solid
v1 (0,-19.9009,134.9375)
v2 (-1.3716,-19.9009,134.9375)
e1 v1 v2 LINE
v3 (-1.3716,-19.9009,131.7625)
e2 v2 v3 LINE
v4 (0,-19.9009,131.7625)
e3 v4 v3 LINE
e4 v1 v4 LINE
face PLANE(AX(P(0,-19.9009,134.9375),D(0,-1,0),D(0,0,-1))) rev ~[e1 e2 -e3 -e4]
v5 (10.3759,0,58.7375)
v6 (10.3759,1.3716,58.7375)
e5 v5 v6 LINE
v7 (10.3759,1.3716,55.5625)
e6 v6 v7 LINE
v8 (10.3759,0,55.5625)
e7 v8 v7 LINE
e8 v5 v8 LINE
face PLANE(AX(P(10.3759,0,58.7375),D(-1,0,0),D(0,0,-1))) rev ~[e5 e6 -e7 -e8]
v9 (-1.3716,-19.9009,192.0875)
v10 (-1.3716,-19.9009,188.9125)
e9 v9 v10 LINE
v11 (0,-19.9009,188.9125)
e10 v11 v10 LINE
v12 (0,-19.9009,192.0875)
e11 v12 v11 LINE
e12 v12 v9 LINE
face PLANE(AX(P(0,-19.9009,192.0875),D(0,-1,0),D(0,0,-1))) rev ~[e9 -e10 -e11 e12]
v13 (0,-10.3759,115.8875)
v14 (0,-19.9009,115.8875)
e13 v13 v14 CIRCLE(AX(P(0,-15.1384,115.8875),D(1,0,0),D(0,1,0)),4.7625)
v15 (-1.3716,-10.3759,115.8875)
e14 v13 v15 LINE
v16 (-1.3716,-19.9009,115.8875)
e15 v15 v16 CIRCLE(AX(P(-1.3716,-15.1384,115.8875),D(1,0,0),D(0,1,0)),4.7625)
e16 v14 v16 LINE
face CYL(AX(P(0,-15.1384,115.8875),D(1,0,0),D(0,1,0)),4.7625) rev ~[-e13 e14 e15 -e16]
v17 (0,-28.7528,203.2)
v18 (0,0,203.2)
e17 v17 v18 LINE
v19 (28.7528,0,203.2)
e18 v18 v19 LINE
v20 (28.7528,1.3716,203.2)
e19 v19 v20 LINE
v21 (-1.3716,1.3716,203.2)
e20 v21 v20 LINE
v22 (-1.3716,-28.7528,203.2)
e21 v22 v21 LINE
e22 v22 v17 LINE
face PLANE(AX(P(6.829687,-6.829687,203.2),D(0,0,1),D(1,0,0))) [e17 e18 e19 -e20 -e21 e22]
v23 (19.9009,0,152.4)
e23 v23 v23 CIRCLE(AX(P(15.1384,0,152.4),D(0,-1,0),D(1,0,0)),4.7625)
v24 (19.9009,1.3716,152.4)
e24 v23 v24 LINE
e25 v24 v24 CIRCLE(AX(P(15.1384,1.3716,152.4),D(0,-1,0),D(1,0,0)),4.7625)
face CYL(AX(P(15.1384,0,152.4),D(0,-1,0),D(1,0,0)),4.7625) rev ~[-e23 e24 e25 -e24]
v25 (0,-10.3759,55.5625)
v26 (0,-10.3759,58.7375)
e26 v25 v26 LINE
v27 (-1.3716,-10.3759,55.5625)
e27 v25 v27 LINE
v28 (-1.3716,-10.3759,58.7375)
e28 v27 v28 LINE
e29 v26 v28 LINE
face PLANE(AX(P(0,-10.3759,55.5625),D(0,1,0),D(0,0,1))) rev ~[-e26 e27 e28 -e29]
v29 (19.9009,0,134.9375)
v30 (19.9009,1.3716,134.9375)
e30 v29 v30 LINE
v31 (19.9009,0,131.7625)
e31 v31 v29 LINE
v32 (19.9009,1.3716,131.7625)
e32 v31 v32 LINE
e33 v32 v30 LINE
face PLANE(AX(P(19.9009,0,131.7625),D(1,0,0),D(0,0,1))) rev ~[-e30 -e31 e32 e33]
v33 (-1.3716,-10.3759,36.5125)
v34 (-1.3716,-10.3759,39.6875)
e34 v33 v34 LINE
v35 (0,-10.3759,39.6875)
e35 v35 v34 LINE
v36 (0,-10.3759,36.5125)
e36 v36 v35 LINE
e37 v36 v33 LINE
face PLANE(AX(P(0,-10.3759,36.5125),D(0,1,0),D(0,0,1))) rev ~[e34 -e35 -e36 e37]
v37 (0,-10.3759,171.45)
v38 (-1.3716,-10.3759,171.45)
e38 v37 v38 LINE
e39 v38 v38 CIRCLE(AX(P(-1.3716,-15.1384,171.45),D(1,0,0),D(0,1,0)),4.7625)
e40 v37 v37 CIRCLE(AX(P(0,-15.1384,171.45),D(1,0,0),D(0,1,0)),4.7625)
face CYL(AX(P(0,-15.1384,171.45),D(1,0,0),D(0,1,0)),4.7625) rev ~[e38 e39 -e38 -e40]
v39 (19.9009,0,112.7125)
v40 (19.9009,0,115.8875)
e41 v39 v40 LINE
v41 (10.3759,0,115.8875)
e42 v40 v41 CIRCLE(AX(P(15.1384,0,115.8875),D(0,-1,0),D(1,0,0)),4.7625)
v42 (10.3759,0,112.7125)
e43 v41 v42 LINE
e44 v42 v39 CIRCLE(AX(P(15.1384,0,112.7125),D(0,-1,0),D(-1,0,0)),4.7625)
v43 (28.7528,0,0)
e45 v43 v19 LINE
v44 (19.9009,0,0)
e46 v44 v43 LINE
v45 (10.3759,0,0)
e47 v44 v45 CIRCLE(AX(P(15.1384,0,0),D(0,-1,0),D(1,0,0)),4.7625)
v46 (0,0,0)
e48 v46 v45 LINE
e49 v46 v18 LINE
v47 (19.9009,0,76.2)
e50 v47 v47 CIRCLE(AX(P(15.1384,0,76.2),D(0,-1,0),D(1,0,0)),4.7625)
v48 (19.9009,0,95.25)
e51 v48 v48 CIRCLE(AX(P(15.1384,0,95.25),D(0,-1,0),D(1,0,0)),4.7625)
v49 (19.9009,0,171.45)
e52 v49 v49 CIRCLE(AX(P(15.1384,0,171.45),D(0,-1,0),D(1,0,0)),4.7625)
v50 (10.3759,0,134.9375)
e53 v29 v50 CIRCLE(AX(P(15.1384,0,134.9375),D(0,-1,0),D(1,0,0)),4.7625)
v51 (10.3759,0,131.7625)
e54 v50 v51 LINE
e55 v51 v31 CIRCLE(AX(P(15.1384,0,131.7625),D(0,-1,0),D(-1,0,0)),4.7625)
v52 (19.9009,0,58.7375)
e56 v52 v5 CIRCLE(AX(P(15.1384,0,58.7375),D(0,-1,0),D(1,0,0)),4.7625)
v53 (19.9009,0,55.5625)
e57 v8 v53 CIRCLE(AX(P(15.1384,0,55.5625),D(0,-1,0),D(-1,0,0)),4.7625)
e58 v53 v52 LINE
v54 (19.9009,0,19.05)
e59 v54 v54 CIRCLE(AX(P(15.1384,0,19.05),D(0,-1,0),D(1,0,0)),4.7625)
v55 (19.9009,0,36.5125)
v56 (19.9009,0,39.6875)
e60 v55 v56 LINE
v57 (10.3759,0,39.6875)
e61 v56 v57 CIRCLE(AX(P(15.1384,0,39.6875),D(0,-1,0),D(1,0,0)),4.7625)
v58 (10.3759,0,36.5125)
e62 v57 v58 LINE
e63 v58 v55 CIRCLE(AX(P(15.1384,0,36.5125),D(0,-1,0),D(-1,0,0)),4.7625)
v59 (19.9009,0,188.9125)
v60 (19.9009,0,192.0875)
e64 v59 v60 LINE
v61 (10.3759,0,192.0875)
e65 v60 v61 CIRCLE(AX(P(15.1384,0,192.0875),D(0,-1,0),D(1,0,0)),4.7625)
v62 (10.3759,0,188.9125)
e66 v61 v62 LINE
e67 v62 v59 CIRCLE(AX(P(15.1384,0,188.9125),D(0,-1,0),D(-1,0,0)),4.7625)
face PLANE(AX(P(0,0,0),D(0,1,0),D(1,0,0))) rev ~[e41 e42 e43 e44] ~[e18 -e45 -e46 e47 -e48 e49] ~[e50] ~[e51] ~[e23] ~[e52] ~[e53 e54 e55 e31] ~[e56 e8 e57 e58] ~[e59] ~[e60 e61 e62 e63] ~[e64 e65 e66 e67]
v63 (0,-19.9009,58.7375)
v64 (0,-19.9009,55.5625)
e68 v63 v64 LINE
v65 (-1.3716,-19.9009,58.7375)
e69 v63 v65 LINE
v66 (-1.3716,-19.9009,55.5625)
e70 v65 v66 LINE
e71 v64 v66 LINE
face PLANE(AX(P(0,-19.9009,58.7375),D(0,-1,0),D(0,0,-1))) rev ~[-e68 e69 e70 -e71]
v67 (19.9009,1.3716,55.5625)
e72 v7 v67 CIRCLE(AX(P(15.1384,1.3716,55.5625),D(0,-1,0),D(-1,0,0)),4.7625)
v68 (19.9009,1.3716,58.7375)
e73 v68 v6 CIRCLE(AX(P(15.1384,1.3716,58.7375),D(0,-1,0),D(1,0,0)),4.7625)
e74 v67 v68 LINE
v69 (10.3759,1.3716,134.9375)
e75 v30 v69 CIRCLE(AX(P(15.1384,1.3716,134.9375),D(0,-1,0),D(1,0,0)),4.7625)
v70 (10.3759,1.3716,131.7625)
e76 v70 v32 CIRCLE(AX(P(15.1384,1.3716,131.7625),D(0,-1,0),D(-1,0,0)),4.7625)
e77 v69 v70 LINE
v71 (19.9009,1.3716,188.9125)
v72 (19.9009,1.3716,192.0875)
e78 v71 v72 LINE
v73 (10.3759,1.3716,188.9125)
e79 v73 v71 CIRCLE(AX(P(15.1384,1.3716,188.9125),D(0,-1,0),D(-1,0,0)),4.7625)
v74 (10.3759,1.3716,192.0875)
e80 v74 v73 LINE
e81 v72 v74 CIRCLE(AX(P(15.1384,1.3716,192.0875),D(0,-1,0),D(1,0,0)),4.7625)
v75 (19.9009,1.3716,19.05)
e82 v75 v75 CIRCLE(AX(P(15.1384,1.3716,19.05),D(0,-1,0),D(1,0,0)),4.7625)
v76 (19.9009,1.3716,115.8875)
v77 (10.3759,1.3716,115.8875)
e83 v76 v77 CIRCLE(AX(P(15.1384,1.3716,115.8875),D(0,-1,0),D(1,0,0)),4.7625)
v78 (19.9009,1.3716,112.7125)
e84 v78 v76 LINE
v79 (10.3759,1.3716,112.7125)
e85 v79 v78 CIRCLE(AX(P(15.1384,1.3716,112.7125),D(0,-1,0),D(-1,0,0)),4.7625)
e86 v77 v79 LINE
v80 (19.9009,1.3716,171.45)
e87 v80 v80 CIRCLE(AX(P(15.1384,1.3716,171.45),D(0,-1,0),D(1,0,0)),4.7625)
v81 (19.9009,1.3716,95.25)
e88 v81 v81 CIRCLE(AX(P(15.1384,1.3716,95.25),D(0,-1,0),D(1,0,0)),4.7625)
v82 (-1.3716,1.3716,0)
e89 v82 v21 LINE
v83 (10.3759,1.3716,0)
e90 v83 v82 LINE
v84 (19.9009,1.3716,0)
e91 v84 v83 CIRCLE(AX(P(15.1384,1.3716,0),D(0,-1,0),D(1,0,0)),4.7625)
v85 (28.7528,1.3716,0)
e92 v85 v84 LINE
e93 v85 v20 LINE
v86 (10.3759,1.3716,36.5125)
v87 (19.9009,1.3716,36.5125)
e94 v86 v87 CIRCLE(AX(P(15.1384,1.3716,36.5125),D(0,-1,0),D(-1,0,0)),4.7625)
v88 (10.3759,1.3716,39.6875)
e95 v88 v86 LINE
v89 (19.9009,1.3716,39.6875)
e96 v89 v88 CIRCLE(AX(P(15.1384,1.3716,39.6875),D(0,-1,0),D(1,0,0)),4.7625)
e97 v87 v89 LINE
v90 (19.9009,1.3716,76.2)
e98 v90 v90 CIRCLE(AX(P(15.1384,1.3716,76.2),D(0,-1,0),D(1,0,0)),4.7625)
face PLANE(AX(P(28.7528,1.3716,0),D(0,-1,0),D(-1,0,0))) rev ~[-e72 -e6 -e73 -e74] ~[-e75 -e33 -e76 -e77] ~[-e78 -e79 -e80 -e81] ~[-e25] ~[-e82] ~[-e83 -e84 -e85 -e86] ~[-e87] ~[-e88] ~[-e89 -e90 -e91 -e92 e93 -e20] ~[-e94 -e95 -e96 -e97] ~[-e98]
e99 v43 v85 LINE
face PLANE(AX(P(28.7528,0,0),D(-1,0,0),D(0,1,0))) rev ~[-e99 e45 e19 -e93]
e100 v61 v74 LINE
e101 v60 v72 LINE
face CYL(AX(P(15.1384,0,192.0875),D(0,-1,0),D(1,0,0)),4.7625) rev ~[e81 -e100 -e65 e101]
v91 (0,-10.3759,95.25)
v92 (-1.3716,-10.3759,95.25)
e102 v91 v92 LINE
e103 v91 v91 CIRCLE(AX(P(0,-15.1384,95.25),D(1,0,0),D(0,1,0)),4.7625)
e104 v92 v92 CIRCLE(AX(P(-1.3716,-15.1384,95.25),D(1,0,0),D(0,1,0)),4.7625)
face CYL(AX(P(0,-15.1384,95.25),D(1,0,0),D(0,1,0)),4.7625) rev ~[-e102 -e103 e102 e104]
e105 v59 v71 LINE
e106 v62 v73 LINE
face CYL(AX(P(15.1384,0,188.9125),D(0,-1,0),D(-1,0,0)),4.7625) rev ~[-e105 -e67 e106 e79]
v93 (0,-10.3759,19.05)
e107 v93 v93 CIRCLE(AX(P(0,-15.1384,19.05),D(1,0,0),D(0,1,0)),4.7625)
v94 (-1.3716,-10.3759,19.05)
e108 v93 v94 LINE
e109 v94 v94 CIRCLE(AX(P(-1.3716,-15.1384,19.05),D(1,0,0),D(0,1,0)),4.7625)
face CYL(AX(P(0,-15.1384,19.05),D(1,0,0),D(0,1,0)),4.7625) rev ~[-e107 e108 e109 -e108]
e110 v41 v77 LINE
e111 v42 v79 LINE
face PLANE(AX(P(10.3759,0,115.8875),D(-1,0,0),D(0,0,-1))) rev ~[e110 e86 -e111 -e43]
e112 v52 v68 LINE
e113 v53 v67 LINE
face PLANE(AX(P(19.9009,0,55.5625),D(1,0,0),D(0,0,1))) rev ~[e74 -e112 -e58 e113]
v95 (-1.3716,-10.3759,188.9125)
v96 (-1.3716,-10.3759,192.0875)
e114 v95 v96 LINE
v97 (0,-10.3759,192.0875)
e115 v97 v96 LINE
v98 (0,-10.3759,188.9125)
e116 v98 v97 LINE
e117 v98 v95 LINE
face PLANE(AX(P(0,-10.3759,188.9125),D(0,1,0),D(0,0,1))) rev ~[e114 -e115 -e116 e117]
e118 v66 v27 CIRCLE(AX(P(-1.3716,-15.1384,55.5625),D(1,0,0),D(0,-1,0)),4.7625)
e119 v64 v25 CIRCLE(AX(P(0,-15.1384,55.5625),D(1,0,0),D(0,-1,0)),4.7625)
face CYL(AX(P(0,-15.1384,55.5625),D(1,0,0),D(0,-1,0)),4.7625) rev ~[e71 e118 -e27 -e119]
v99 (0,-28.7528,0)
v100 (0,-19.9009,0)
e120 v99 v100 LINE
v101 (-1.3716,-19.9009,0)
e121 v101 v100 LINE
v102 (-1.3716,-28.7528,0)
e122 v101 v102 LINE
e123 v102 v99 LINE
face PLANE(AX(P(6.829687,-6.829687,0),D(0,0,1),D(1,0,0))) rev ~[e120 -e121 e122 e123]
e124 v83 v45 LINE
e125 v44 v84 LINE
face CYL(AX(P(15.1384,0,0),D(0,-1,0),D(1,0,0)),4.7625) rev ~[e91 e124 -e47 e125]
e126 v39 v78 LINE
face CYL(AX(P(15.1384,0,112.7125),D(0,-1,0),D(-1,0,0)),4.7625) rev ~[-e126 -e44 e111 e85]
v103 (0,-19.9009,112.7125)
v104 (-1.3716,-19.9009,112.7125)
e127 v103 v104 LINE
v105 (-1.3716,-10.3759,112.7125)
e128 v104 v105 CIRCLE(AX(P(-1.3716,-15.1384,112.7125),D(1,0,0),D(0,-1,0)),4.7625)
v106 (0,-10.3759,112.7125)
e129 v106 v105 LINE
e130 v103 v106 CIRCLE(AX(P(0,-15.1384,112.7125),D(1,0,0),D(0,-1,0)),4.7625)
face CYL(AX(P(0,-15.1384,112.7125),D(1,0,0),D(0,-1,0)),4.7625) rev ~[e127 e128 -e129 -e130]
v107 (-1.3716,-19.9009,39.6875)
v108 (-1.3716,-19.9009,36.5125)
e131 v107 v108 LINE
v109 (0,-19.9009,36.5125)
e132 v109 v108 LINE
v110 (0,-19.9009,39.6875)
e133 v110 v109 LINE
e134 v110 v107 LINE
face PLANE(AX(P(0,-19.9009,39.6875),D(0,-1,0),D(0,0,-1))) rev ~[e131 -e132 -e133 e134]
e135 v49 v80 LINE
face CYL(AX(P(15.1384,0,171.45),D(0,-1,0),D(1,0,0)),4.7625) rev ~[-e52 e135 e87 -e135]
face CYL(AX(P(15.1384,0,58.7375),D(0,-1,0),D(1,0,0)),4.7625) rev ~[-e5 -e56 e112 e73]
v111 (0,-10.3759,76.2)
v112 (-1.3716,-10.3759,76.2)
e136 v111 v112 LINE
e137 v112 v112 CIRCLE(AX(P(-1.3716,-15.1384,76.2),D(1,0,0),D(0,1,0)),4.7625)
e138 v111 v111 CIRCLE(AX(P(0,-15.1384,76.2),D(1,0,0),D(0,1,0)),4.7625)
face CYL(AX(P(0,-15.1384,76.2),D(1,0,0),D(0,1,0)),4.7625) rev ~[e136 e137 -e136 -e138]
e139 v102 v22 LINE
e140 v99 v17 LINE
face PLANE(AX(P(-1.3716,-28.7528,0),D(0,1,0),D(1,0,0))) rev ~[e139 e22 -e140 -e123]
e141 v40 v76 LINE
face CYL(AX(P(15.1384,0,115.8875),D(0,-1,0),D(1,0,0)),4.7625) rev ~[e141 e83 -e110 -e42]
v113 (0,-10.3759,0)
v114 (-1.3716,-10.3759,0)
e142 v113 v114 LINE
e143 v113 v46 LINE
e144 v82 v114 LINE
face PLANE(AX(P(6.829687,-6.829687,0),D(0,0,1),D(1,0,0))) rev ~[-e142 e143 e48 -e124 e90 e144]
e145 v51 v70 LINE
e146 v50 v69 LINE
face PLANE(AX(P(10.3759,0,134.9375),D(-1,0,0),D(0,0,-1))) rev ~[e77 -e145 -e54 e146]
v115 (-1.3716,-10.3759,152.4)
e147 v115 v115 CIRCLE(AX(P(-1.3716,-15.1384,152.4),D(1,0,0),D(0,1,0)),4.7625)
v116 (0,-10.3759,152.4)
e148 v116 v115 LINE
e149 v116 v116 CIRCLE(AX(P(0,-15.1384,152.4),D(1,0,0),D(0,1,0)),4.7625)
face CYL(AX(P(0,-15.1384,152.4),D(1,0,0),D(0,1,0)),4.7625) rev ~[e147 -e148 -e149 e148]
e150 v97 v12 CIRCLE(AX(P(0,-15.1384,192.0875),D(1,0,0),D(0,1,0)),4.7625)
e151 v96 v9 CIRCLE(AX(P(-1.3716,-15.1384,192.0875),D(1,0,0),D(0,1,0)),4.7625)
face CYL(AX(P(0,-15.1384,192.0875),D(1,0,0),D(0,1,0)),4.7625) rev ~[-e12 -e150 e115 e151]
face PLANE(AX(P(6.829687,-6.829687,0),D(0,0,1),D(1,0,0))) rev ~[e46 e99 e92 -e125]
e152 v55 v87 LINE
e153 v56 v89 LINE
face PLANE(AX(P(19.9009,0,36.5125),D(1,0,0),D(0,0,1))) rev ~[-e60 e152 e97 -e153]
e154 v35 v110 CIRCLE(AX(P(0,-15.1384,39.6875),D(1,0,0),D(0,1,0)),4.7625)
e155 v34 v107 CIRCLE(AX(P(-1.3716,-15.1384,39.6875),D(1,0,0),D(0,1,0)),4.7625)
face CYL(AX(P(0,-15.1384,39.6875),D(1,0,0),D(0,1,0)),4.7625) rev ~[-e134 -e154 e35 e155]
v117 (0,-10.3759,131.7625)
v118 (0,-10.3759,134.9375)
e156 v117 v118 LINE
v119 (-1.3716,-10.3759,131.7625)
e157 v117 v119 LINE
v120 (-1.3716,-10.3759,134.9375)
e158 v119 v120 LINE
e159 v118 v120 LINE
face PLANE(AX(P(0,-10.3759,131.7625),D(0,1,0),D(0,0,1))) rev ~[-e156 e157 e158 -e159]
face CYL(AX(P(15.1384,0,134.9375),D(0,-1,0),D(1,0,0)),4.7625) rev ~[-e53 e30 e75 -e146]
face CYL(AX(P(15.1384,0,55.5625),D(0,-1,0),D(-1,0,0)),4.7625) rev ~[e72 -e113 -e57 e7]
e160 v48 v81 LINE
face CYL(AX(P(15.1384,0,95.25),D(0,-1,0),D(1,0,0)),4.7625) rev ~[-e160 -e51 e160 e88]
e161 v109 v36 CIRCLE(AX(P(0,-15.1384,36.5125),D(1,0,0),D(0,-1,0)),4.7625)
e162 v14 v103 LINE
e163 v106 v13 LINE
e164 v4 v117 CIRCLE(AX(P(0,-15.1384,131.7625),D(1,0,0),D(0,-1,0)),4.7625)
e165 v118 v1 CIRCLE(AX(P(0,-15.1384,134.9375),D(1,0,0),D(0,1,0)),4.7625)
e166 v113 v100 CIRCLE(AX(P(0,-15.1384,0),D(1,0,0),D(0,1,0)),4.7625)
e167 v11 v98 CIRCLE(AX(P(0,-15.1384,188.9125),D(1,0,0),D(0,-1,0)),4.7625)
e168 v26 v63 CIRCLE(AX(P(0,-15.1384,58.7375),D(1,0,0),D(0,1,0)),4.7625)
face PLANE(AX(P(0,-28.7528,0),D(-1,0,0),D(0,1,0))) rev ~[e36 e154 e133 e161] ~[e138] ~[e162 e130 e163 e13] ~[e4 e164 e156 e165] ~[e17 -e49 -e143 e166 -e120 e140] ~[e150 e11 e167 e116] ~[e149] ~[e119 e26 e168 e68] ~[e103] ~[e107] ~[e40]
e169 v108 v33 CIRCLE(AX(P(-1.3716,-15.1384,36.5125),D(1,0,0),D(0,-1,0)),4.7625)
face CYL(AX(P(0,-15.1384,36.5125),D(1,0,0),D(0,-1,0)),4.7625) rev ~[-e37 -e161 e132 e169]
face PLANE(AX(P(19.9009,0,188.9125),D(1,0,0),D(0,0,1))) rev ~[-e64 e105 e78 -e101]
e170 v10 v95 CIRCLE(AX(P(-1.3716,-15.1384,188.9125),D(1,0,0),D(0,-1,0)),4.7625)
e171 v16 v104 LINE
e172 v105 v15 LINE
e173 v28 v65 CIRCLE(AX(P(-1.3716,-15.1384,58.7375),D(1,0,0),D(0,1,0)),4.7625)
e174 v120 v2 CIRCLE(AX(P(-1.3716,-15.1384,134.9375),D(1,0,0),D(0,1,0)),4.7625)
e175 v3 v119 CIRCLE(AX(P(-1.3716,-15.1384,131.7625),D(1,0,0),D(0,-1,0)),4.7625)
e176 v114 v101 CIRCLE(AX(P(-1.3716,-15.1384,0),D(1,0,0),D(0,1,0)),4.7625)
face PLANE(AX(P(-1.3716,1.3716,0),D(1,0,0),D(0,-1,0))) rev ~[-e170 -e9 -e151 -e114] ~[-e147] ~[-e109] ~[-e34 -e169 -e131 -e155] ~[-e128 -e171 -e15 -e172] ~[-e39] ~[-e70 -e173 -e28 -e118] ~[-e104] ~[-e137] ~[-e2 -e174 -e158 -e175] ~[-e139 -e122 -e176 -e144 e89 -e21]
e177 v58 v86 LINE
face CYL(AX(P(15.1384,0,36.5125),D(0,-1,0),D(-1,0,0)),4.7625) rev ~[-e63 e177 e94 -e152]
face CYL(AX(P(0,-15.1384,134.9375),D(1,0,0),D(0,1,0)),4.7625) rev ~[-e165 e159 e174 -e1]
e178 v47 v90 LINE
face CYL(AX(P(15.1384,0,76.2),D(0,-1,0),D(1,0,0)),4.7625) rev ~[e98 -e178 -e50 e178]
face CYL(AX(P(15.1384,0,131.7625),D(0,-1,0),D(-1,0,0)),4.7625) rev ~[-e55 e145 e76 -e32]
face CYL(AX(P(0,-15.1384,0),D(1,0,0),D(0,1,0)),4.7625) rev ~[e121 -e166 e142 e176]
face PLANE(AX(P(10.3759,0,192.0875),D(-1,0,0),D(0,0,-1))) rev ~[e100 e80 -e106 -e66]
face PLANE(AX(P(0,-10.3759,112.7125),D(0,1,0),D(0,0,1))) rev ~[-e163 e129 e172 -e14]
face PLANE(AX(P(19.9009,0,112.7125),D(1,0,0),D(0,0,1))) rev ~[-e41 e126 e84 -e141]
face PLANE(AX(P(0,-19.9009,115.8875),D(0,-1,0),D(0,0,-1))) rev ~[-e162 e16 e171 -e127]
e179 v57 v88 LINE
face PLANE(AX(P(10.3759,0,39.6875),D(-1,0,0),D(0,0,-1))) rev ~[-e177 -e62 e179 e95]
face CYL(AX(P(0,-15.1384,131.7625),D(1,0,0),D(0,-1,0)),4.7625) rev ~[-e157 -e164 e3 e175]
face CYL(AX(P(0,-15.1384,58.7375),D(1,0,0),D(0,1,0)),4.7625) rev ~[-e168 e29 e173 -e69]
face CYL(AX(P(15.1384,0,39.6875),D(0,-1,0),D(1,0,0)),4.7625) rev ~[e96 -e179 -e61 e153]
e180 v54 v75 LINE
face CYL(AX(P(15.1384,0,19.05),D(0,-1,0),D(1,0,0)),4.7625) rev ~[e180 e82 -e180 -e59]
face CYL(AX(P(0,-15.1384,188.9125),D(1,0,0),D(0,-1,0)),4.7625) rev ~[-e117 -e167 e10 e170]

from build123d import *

# Parameters (mm, degrees)
F2_DEPTH = 203.2
F3_R     = 4.7625
F5_DEPTH = 1.3726
F4_R     = 4.7625
F6_DEPTH = 1.3726


# Not quite as in the source:
# - a variable given as a bare number and used for a length is read in inches; the dataset says mm whatever the document's units were


with BuildPart() as f2:
    # F1 (on Top) → F2 (new body)
    with BuildSketch(Plane.XY):
        Polygon((-1.3716, 1.3716), (-1.3716, -28.7528), (0, -28.7528), (0, 0), (28.7528, 0), (28.7528, 1.3716), align=None)
    extrude(amount=F2_DEPTH)

    # F3 (on face) → F5 (cut, through all)
    with BuildSketch(Plane.XZ):
        with Locations((15.1384, 19.05)):
            Circle(F3_R)
        with Locations((15.1384, 0)):
            Circle(F3_R)
        with BuildLine():
            Line((19.9009, 36.5125), (19.9009, 39.6875))
            ThreePointArc((19.9009, 39.6875), (15.1384, 44.45), (10.3759, 39.6875))
            Line((10.3759, 39.6875), (10.3759, 36.5125))
            ThreePointArc((10.3759, 36.5125), (15.1384, 31.75), (19.9009, 36.5125))
        make_face()
        with BuildLine():
            Line((19.9009, 55.5625), (19.9009, 58.7375))
            ThreePointArc((19.9009, 58.7375), (15.1384, 63.5), (10.3759, 58.7375))
            Line((10.3759, 58.7375), (10.3759, 55.5625))
            ThreePointArc((10.3759, 55.5625), (15.1384, 50.8), (19.9009, 55.5625))
        make_face()
        with BuildLine():
            Line((19.9009, 131.7625), (19.9009, 134.9375))
            ThreePointArc((19.9009, 134.9375), (15.1384, 139.7), (10.3759, 134.9375))
            Line((10.3759, 134.9375), (10.3759, 131.7625))
            ThreePointArc((10.3759, 131.7625), (15.1384, 127), (19.9009, 131.7625))
        make_face()
        with Locations((15.1384, 95.25)):
            Circle(F3_R)
        with Locations((15.1384, 76.2)):
            Circle(F3_R)
        with BuildLine():
            Line((19.9009, 112.7125), (19.9009, 115.8875))
            ThreePointArc((19.9009, 115.8875), (15.1384, 120.65), (10.3759, 115.8875))
            Line((10.3759, 115.8875), (10.3759, 112.7125))
            ThreePointArc((10.3759, 112.7125), (15.1384, 107.95), (19.9009, 112.7125))
        make_face()
        with BuildLine():
            Line((19.9009, 207.9625), (19.9009, 211.1375))
            ThreePointArc((19.9009, 211.1375), (15.1384, 215.9), (10.3759, 211.1375))
            Line((10.3759, 211.1375), (10.3759, 207.9625))
            ThreePointArc((10.3759, 207.9625), (15.1384, 203.2), (19.9009, 207.9625))
        make_face()
        with Locations((15.1384, 171.45)):
            Circle(F3_R)
        with Locations((15.1384, 152.4)):
            Circle(F3_R)
        with BuildLine():
            Line((19.9009, 188.9125), (19.9009, 192.0875))
            ThreePointArc((19.9009, 192.0875), (15.1384, 196.85), (10.3759, 192.0875))
            Line((10.3759, 192.0875), (10.3759, 188.9125))
            ThreePointArc((10.3759, 188.9125), (15.1384, 184.15), (19.9009, 188.9125))
        make_face()
        with BuildLine():
            Line((19.9009, 284.1625), (19.9009, 287.3375))
            ThreePointArc((19.9009, 287.3375), (15.1384, 292.1), (10.3759, 287.3375))
            Line((10.3759, 287.3375), (10.3759, 284.1625))
            ThreePointArc((10.3759, 284.1625), (15.1384, 279.4), (19.9009, 284.1625))
        make_face()
        with Locations((15.1384, 247.65)):
            Circle(F3_R)
        with Locations((15.1384, 228.6)):
            Circle(F3_R)
        with BuildLine():
            Line((19.9009, 265.1125), (19.9009, 268.2875))
            ThreePointArc((19.9009, 268.2875), (15.1384, 273.05), (10.3759, 268.2875))
            Line((10.3759, 268.2875), (10.3759, 265.1125))
            ThreePointArc((10.3759, 265.1125), (15.1384, 260.35), (19.9009, 265.1125))
        make_face()
        with BuildLine():
            Line((19.9009, 360.3625), (19.9009, 363.5375))
            ThreePointArc((19.9009, 363.5375), (15.1384, 368.3), (10.3759, 363.5375))
            Line((10.3759, 363.5375), (10.3759, 360.3625))
            ThreePointArc((10.3759, 360.3625), (15.1384, 355.6), (19.9009, 360.3625))
        make_face()
        with Locations((15.1384, 323.85)):
            Circle(F3_R)
        with Locations((15.1384, 304.8)):
            Circle(F3_R)
        with BuildLine():
            Line((19.9009, 341.3125), (19.9009, 344.4875))
            ThreePointArc((19.9009, 344.4875), (15.1384, 349.25), (10.3759, 344.4875))
            Line((10.3759, 344.4875), (10.3759, 341.3125))
            ThreePointArc((10.3759, 341.3125), (15.1384, 336.55), (19.9009, 341.3125))
        make_face()
        with BuildLine():
            Line((19.9009, 436.5625), (19.9009, 439.7375))
            ThreePointArc((19.9009, 439.7375), (15.1384, 444.5), (10.3759, 439.7375))
            Line((10.3759, 439.7375), (10.3759, 436.5625))
            ThreePointArc((10.3759, 436.5625), (15.1384, 431.8), (19.9009, 436.5625))
        make_face()
        with Locations((15.1384, 400.05)):
            Circle(F3_R)
        with Locations((15.1384, 381)):
            Circle(F3_R)
        with BuildLine():
            Line((19.9009, 417.5125), (19.9009, 420.6875))
            ThreePointArc((19.9009, 420.6875), (15.1384, 425.45), (10.3759, 420.6875))
            Line((10.3759, 420.6875), (10.3759, 417.5125))
            ThreePointArc((10.3759, 417.5125), (15.1384, 412.75), (19.9009, 417.5125))
        make_face()
        with BuildLine():
            Line((19.9009, 512.7625), (19.9009, 515.9375))
            ThreePointArc((19.9009, 515.9375), (15.1384, 520.7), (10.3759, 515.9375))
            Line((10.3759, 515.9375), (10.3759, 512.7625))
            ThreePointArc((10.3759, 512.7625), (15.1384, 508), (19.9009, 512.7625))
        make_face()
        with Locations((15.1384, 476.25)):
            Circle(F3_R)
        with Locations((15.1384, 457.2)):
            Circle(F3_R)
        with BuildLine():
            Line((19.9009, 493.7125), (19.9009, 496.8875))
            ThreePointArc((19.9009, 496.8875), (15.1384, 501.65), (10.3759, 496.8875))
            Line((10.3759, 496.8875), (10.3759, 493.7125))
            ThreePointArc((10.3759, 493.7125), (15.1384, 488.95), (19.9009, 493.7125))
        make_face()
        with BuildLine():
            Line((19.9009, 588.9625), (19.9009, 592.1375))
            ThreePointArc((19.9009, 592.1375), (15.1384, 596.9), (10.3759, 592.1375))
            Line((10.3759, 592.1375), (10.3759, 588.9625))
            ThreePointArc((10.3759, 588.9625), (15.1384, 584.2), (19.9009, 588.9625))
        make_face()
        with Locations((15.1384, 552.45)):
            Circle(F3_R)
        with Locations((15.1384, 533.4)):
            Circle(F3_R)
        with BuildLine():
            Line((19.9009, 569.9125), (19.9009, 573.0875))
            ThreePointArc((19.9009, 573.0875), (15.1384, 577.85), (10.3759, 573.0875))
            Line((10.3759, 573.0875), (10.3759, 569.9125))
            ThreePointArc((10.3759, 569.9125), (15.1384, 565.15), (19.9009, 569.9125))
        make_face()
        with BuildLine():
            Line((19.9009, 665.1625), (19.9009, 668.3375))
            ThreePointArc((19.9009, 668.3375), (15.1384, 673.1), (10.3759, 668.3375))
            Line((10.3759, 668.3375), (10.3759, 665.1625))
            ThreePointArc((10.3759, 665.1625), (15.1384, 660.4), (19.9009, 665.1625))
        make_face()
        with Locations((15.1384, 628.65)):
            Circle(F3_R)
        with Locations((15.1384, 609.6)):
            Circle(F3_R)
        with BuildLine():
            Line((19.9009, 646.1125), (19.9009, 649.2875))
            ThreePointArc((19.9009, 649.2875), (15.1384, 654.05), (10.3759, 649.2875))
            Line((10.3759, 649.2875), (10.3759, 646.1125))
            ThreePointArc((10.3759, 646.1125), (15.1384, 641.35), (19.9009, 646.1125))
        make_face()
        with BuildLine():
            Line((19.9009, 741.3625), (19.9009, 744.5375))
            ThreePointArc((19.9009, 744.5375), (15.1384, 749.3), (10.3759, 744.5375))
            Line((10.3759, 744.5375), (10.3759, 741.3625))
            ThreePointArc((10.3759, 741.3625), (15.1384, 736.6), (19.9009, 741.3625))
        make_face()
        with Locations((15.1384, 704.85)):
            Circle(F3_R)
        with Locations((15.1384, 685.8)):
            Circle(F3_R)
        with BuildLine():
            Line((19.9009, 722.3125), (19.9009, 725.4875))
            ThreePointArc((19.9009, 725.4875), (15.1384, 730.25), (10.3759, 725.4875))
            Line((10.3759, 725.4875), (10.3759, 722.3125))
            ThreePointArc((10.3759, 722.3125), (15.1384, 717.55), (19.9009, 722.3125))
        make_face()
        with BuildLine():
            Line((19.9009, 817.5625), (19.9009, 820.7375))
            ThreePointArc((19.9009, 820.7375), (15.1384, 825.5), (10.3759, 820.7375))
            Line((10.3759, 820.7375), (10.3759, 817.5625))
            ThreePointArc((10.3759, 817.5625), (15.1384, 812.8), (19.9009, 817.5625))
        make_face()
        with Locations((15.1384, 781.05)):
            Circle(F3_R)
        with Locations((15.1384, 762)):
            Circle(F3_R)
        with BuildLine():
            Line((19.9009, 798.5125), (19.9009, 801.6875))
            ThreePointArc((19.9009, 801.6875), (15.1384, 806.45), (10.3759, 801.6875))
            Line((10.3759, 801.6875), (10.3759, 798.5125))
            ThreePointArc((10.3759, 798.5125), (15.1384, 793.75), (19.9009, 798.5125))
        make_face()
        with BuildLine():
            Line((19.9009, 893.7625), (19.9009, 896.9375))
            ThreePointArc((19.9009, 896.9375), (15.1384, 901.7), (10.3759, 896.9375))
            Line((10.3759, 896.9375), (10.3759, 893.7625))
            ThreePointArc((10.3759, 893.7625), (15.1384, 889), (19.9009, 893.7625))
        make_face()
        with Locations((15.1384, 857.25)):
            Circle(F3_R)
        with Locations((15.1384, 838.2)):
            Circle(F3_R)
        with BuildLine():
            Line((19.9009, 874.7125), (19.9009, 877.8875))
            ThreePointArc((19.9009, 877.8875), (15.1384, 882.65), (10.3759, 877.8875))
            Line((10.3759, 877.8875), (10.3759, 874.7125))
            ThreePointArc((10.3759, 874.7125), (15.1384, 869.95), (19.9009, 874.7125))
        make_face()
        with BuildLine():
            Line((19.9009, 969.9625), (19.9009, 973.1375))
            ThreePointArc((19.9009, 973.1375), (15.1384, 977.9), (10.3759, 973.1375))
            Line((10.3759, 973.1375), (10.3759, 969.9625))
            ThreePointArc((10.3759, 969.9625), (15.1384, 965.2), (19.9009, 969.9625))
        make_face()
        with Locations((15.1384, 933.45)):
            Circle(F3_R)
        with Locations((15.1384, 914.4)):
            Circle(F3_R)
        with BuildLine():
            Line((19.9009, 950.9125), (19.9009, 954.0875))
            ThreePointArc((19.9009, 954.0875), (15.1384, 958.85), (10.3759, 954.0875))
            Line((10.3759, 954.0875), (10.3759, 950.9125))
            ThreePointArc((10.3759, 950.9125), (15.1384, 946.15), (19.9009, 950.9125))
        make_face()
        with BuildLine():
            Line((19.9009, 1046.1625), (19.9009, 1049.3375))
            ThreePointArc((19.9009, 1049.3375), (15.1384, 1054.1), (10.3759, 1049.3375))
            Line((10.3759, 1049.3375), (10.3759, 1046.1625))
            ThreePointArc((10.3759, 1046.1625), (15.1384, 1041.4), (19.9009, 1046.1625))
        make_face()
        with Locations((15.1384, 1009.65)):
            Circle(F3_R)
        with Locations((15.1384, 990.6)):
            Circle(F3_R)
        with BuildLine():
            Line((19.9009, 1027.1125), (19.9009, 1030.2875))
            ThreePointArc((19.9009, 1030.2875), (15.1384, 1035.05), (10.3759, 1030.2875))
            Line((10.3759, 1030.2875), (10.3759, 1027.1125))
            ThreePointArc((10.3759, 1027.1125), (15.1384, 1022.35), (19.9009, 1027.1125))
        make_face()
        with BuildLine():
            Line((19.9009, 1122.3625), (19.9009, 1125.5375))
            ThreePointArc((19.9009, 1125.5375), (15.1384, 1130.3), (10.3759, 1125.5375))
            Line((10.3759, 1125.5375), (10.3759, 1122.3625))
            ThreePointArc((10.3759, 1122.3625), (15.1384, 1117.6), (19.9009, 1122.3625))
        make_face()
        with Locations((15.1384, 1085.85)):
            Circle(F3_R)
        with Locations((15.1384, 1066.8)):
            Circle(F3_R)
        with BuildLine():
            Line((19.9009, 1103.3125), (19.9009, 1106.4875))
            ThreePointArc((19.9009, 1106.4875), (15.1384, 1111.25), (10.3759, 1106.4875))
            Line((10.3759, 1106.4875), (10.3759, 1103.3125))
            ThreePointArc((10.3759, 1103.3125), (15.1384, 1098.55), (19.9009, 1103.3125))
        make_face()
        with BuildLine():
            Line((19.9009, 1198.5625), (19.9009, 1201.7375))
            ThreePointArc((19.9009, 1201.7375), (15.1384, 1206.5), (10.3759, 1201.7375))
            Line((10.3759, 1201.7375), (10.3759, 1198.5625))
            ThreePointArc((10.3759, 1198.5625), (15.1384, 1193.8), (19.9009, 1198.5625))
        make_face()
        with Locations((15.1384, 1162.05)):
            Circle(F3_R)
        with Locations((15.1384, 1143)):
            Circle(F3_R)
        with BuildLine():
            Line((19.9009, 1179.5125), (19.9009, 1182.6875))
            ThreePointArc((19.9009, 1182.6875), (15.1384, 1187.45), (10.3759, 1182.6875))
            Line((10.3759, 1182.6875), (10.3759, 1179.5125))
            ThreePointArc((10.3759, 1179.5125), (15.1384, 1174.75), (19.9009, 1179.5125))
        make_face()
        with BuildLine():
            Line((19.9009, 1274.7625), (19.9009, 1277.9375))
            ThreePointArc((19.9009, 1277.9375), (15.1384, 1282.7), (10.3759, 1277.9375))
            Line((10.3759, 1277.9375), (10.3759, 1274.7625))
            ThreePointArc((10.3759, 1274.7625), (15.1384, 1270), (19.9009, 1274.7625))
        make_face()
        with Locations((15.1384, 1238.25)):
            Circle(F3_R)
        with Locations((15.1384, 1219.2)):
            Circle(F3_R)
        with BuildLine():
            Line((19.9009, 1255.7125), (19.9009, 1258.8875))
            ThreePointArc((19.9009, 1258.8875), (15.1384, 1263.65), (10.3759, 1258.8875))
            Line((10.3759, 1258.8875), (10.3759, 1255.7125))
            ThreePointArc((10.3759, 1255.7125), (15.1384, 1250.95), (19.9009, 1255.7125))
        make_face()
        with BuildLine():
            Line((19.9009, 1350.9625), (19.9009, 1354.1375))
            ThreePointArc((19.9009, 1354.1375), (15.1384, 1358.9), (10.3759, 1354.1375))
            Line((10.3759, 1354.1375), (10.3759, 1350.9625))
            ThreePointArc((10.3759, 1350.9625), (15.1384, 1346.2), (19.9009, 1350.9625))
        make_face()
        with Locations((15.1384, 1314.45)):
            Circle(F3_R)
        with Locations((15.1384, 1295.4)):
            Circle(F3_R)
        with BuildLine():
            Line((19.9009, 1331.9125), (19.9009, 1335.0875))
            ThreePointArc((19.9009, 1335.0875), (15.1384, 1339.85), (10.3759, 1335.0875))
            Line((10.3759, 1335.0875), (10.3759, 1331.9125))
            ThreePointArc((10.3759, 1331.9125), (15.1384, 1327.15), (19.9009, 1331.9125))
        make_face()
        with BuildLine():
            Line((19.9009, 1427.1625), (19.9009, 1430.3375))
            ThreePointArc((19.9009, 1430.3375), (15.1384, 1435.1), (10.3759, 1430.3375))
            Line((10.3759, 1430.3375), (10.3759, 1427.1625))
            ThreePointArc((10.3759, 1427.1625), (15.1384, 1422.4), (19.9009, 1427.1625))
        make_face()
        with Locations((15.1384, 1390.65)):
            Circle(F3_R)
        with Locations((15.1384, 1371.6)):
            Circle(F3_R)
        with BuildLine():
            Line((19.9009, 1408.1125), (19.9009, 1411.2875))
            ThreePointArc((19.9009, 1411.2875), (15.1384, 1416.05), (10.3759, 1411.2875))
            Line((10.3759, 1411.2875), (10.3759, 1408.1125))
            ThreePointArc((10.3759, 1408.1125), (15.1384, 1403.35), (19.9009, 1408.1125))
        make_face()
        with BuildLine():
            Line((19.9009, 1503.3625), (19.9009, 1506.5375))
            ThreePointArc((19.9009, 1506.5375), (15.1384, 1511.3), (10.3759, 1506.5375))
            Line((10.3759, 1506.5375), (10.3759, 1503.3625))
            ThreePointArc((10.3759, 1503.3625), (15.1384, 1498.6), (19.9009, 1503.3625))
        make_face()
        with Locations((15.1384, 1466.85)):
            Circle(F3_R)
        with Locations((15.1384, 1447.8)):
            Circle(F3_R)
        with BuildLine():
            Line((19.9009, 1484.3125), (19.9009, 1487.4875))
            ThreePointArc((19.9009, 1487.4875), (15.1384, 1492.25), (10.3759, 1487.4875))
            Line((10.3759, 1487.4875), (10.3759, 1484.3125))
            ThreePointArc((10.3759, 1484.3125), (15.1384, 1479.55), (19.9009, 1484.3125))
        make_face()
        with BuildLine():
            Line((19.9009, 1579.5625), (19.9009, 1582.7375))
            ThreePointArc((19.9009, 1582.7375), (15.1384, 1587.5), (10.3759, 1582.7375))
            Line((10.3759, 1582.7375), (10.3759, 1579.5625))
            ThreePointArc((10.3759, 1579.5625), (15.1384, 1574.8), (19.9009, 1579.5625))
        make_face()
        with Locations((15.1384, 1543.05)):
            Circle(F3_R)
        with Locations((15.1384, 1524)):
            Circle(F3_R)
        with BuildLine():
            Line((19.9009, 1560.5125), (19.9009, 1563.6875))
            ThreePointArc((19.9009, 1563.6875), (15.1384, 1568.45), (10.3759, 1563.6875))
            Line((10.3759, 1563.6875), (10.3759, 1560.5125))
            ThreePointArc((10.3759, 1560.5125), (15.1384, 1555.75), (19.9009, 1560.5125))
        make_face()
        with BuildLine():
            Line((19.9009, 1655.7625), (19.9009, 1658.9375))
            ThreePointArc((19.9009, 1658.9375), (15.1384, 1663.7), (10.3759, 1658.9375))
            Line((10.3759, 1658.9375), (10.3759, 1655.7625))
            ThreePointArc((10.3759, 1655.7625), (15.1384, 1651), (19.9009, 1655.7625))
        make_face()
        with Locations((15.1384, 1619.25)):
            Circle(F3_R)
        with Locations((15.1384, 1600.2)):
            Circle(F3_R)
        with BuildLine():
            Line((19.9009, 1636.7125), (19.9009, 1639.8875))
            ThreePointArc((19.9009, 1639.8875), (15.1384, 1644.65), (10.3759, 1639.8875))
            Line((10.3759, 1639.8875), (10.3759, 1636.7125))
            ThreePointArc((10.3759, 1636.7125), (15.1384, 1631.95), (19.9009, 1636.7125))
        make_face()
        with BuildLine():
            Line((19.9009, 1731.9625), (19.9009, 1735.1375))
            ThreePointArc((19.9009, 1735.1375), (15.1384, 1739.9), (10.3759, 1735.1375))
            Line((10.3759, 1735.1375), (10.3759, 1731.9625))
            ThreePointArc((10.3759, 1731.9625), (15.1384, 1727.2), (19.9009, 1731.9625))
        make_face()
        with Locations((15.1384, 1695.45)):
            Circle(F3_R)
        with Locations((15.1384, 1676.4)):
            Circle(F3_R)
        with BuildLine():
            Line((19.9009, 1712.9125), (19.9009, 1716.0875))
            ThreePointArc((19.9009, 1716.0875), (15.1384, 1720.85), (10.3759, 1716.0875))
            Line((10.3759, 1716.0875), (10.3759, 1712.9125))
            ThreePointArc((10.3759, 1712.9125), (15.1384, 1708.15), (19.9009, 1712.9125))
        make_face()
        with BuildLine():
            Line((19.9009, 1808.1625), (19.9009, 1811.3375))
            ThreePointArc((19.9009, 1811.3375), (15.1384, 1816.1), (10.3759, 1811.3375))
            Line((10.3759, 1811.3375), (10.3759, 1808.1625))
            ThreePointArc((10.3759, 1808.1625), (15.1384, 1803.4), (19.9009, 1808.1625))
        make_face()
        with Locations((15.1384, 1771.65)):
            Circle(F3_R)
        with Locations((15.1384, 1752.6)):
            Circle(F3_R)
        with BuildLine():
            Line((19.9009, 1789.1125), (19.9009, 1792.2875))
            ThreePointArc((19.9009, 1792.2875), (15.1384, 1797.05), (10.3759, 1792.2875))
            Line((10.3759, 1792.2875), (10.3759, 1789.1125))
            ThreePointArc((10.3759, 1789.1125), (15.1384, 1784.35), (19.9009, 1789.1125))
        make_face()
    extrude(amount=-F5_DEPTH, mode=Mode.SUBTRACT)

    # F4 (on face) → F6 (cut, through all)
    with BuildSketch(Plane.YZ):
        with Locations((-15.1384, 19.05)):
            Circle(F4_R)
        with Locations((-15.1384, 0)):
            Circle(F4_R)
        with BuildLine():
            Line((-10.3759, 36.5125), (-10.3759, 39.6875))
            ThreePointArc((-10.3759, 39.6875), (-15.1384, 44.45), (-19.9009, 39.6875))
            Line((-19.9009, 39.6875), (-19.9009, 36.5125))
            ThreePointArc((-19.9009, 36.5125), (-15.1384, 31.75), (-10.3759, 36.5125))
        make_face()
        with BuildLine():
            Line((-10.3759, 55.5625), (-10.3759, 58.7375))
            ThreePointArc((-10.3759, 58.7375), (-15.1384, 63.5), (-19.9009, 58.7375))
            Line((-19.9009, 58.7375), (-19.9009, 55.5625))
            ThreePointArc((-19.9009, 55.5625), (-15.1384, 50.8), (-10.3759, 55.5625))
        make_face()
        with BuildLine():
            Line((-10.3759, 131.7625), (-10.3759, 134.9375))
            ThreePointArc((-10.3759, 134.9375), (-15.1384, 139.7), (-19.9009, 134.9375))
            Line((-19.9009, 134.9375), (-19.9009, 131.7625))
            ThreePointArc((-19.9009, 131.7625), (-15.1384, 127), (-10.3759, 131.7625))
        make_face()
        with Locations((-15.1384, 95.25)):
            Circle(F4_R)
        with Locations((-15.1384, 76.2)):
            Circle(F4_R)
        with BuildLine():
            Line((-10.3759, 112.7125), (-10.3759, 115.8875))
            ThreePointArc((-10.3759, 115.8875), (-15.1384, 120.65), (-19.9009, 115.8875))
            Line((-19.9009, 115.8875), (-19.9009, 112.7125))
            ThreePointArc((-19.9009, 112.7125), (-15.1384, 107.95), (-10.3759, 112.7125))
        make_face()
        with BuildLine():
            Line((-10.3759, 207.9625), (-10.3759, 211.1375))
            ThreePointArc((-10.3759, 211.1375), (-15.1384, 215.9), (-19.9009, 211.1375))
            Line((-19.9009, 211.1375), (-19.9009, 207.9625))
            ThreePointArc((-19.9009, 207.9625), (-15.1384, 203.2), (-10.3759, 207.9625))
        make_face()
        with Locations((-15.1384, 171.45)):
            Circle(F4_R)
        with Locations((-15.1384, 152.4)):
            Circle(F4_R)
        with BuildLine():
            Line((-10.3759, 188.9125), (-10.3759, 192.0875))
            ThreePointArc((-10.3759, 192.0875), (-15.1384, 196.85), (-19.9009, 192.0875))
            Line((-19.9009, 192.0875), (-19.9009, 188.9125))
            ThreePointArc((-19.9009, 188.9125), (-15.1384, 184.15), (-10.3759, 188.9125))
        make_face()
        with BuildLine():
            Line((-10.3759, 284.1625), (-10.3759, 287.3375))
            ThreePointArc((-10.3759, 287.3375), (-15.1384, 292.1), (-19.9009, 287.3375))
            Line((-19.9009, 287.3375), (-19.9009, 284.1625))
            ThreePointArc((-19.9009, 284.1625), (-15.1384, 279.4), (-10.3759, 284.1625))
        make_face()
        with Locations((-15.1384, 247.65)):
            Circle(F4_R)
        with Locations((-15.1384, 228.6)):
            Circle(F4_R)
        with BuildLine():
            Line((-10.3759, 265.1125), (-10.3759, 268.2875))
            ThreePointArc((-10.3759, 268.2875), (-15.1384, 273.05), (-19.9009, 268.2875))
            Line((-19.9009, 268.2875), (-19.9009, 265.1125))
            ThreePointArc((-19.9009, 265.1125), (-15.1384, 260.35), (-10.3759, 265.1125))
        make_face()
        with BuildLine():
            Line((-10.3759, 360.3625), (-10.3759, 363.5375))
            ThreePointArc((-10.3759, 363.5375), (-15.1384, 368.3), (-19.9009, 363.5375))
            Line((-19.9009, 363.5375), (-19.9009, 360.3625))
            ThreePointArc((-19.9009, 360.3625), (-15.1384, 355.6), (-10.3759, 360.3625))
        make_face()
        with Locations((-15.1384, 323.85)):
            Circle(F4_R)
        with Locations((-15.1384, 304.8)):
            Circle(F4_R)
        with BuildLine():
            Line((-10.3759, 341.3125), (-10.3759, 344.4875))
            ThreePointArc((-10.3759, 344.4875), (-15.1384, 349.25), (-19.9009, 344.4875))
            Line((-19.9009, 344.4875), (-19.9009, 341.3125))
            ThreePointArc((-19.9009, 341.3125), (-15.1384, 336.55), (-10.3759, 341.3125))
        make_face()
        with BuildLine():
            Line((-10.3759, 436.5625), (-10.3759, 439.7375))
            ThreePointArc((-10.3759, 439.7375), (-15.1384, 444.5), (-19.9009, 439.7375))
            Line((-19.9009, 439.7375), (-19.9009, 436.5625))
            ThreePointArc((-19.9009, 436.5625), (-15.1384, 431.8), (-10.3759, 436.5625))
        make_face()
        with Locations((-15.1384, 400.05)):
            Circle(F4_R)
        with Locations((-15.1384, 381)):
            Circle(F4_R)
        with BuildLine():
            Line((-10.3759, 417.5125), (-10.3759, 420.6875))
            ThreePointArc((-10.3759, 420.6875), (-15.1384, 425.45), (-19.9009, 420.6875))
            Line((-19.9009, 420.6875), (-19.9009, 417.5125))
            ThreePointArc((-19.9009, 417.5125), (-15.1384, 412.75), (-10.3759, 417.5125))
        make_face()
        with BuildLine():
            Line((-10.3759, 512.7625), (-10.3759, 515.9375))
            ThreePointArc((-10.3759, 515.9375), (-15.1384, 520.7), (-19.9009, 515.9375))
            Line((-19.9009, 515.9375), (-19.9009, 512.7625))
            ThreePointArc((-19.9009, 512.7625), (-15.1384, 508), (-10.3759, 512.7625))
        make_face()
        with Locations((-15.1384, 476.25)):
            Circle(F4_R)
        with Locations((-15.1384, 457.2)):
            Circle(F4_R)
        with BuildLine():
            Line((-10.3759, 493.7125), (-10.3759, 496.8875))
            ThreePointArc((-10.3759, 496.8875), (-15.1384, 501.65), (-19.9009, 496.8875))
            Line((-19.9009, 496.8875), (-19.9009, 493.7125))
            ThreePointArc((-19.9009, 493.7125), (-15.1384, 488.95), (-10.3759, 493.7125))
        make_face()
        with BuildLine():
            Line((-10.3759, 588.9625), (-10.3759, 592.1375))
            ThreePointArc((-10.3759, 592.1375), (-15.1384, 596.9), (-19.9009, 592.1375))
            Line((-19.9009, 592.1375), (-19.9009, 588.9625))
            ThreePointArc((-19.9009, 588.9625), (-15.1384, 584.2), (-10.3759, 588.9625))
        make_face()
        with Locations((-15.1384, 552.45)):
            Circle(F4_R)
        with Locations((-15.1384, 533.4)):
            Circle(F4_R)
        with BuildLine():
            Line((-10.3759, 569.9125), (-10.3759, 573.0875))
            ThreePointArc((-10.3759, 573.0875), (-15.1384, 577.85), (-19.9009, 573.0875))
            Line((-19.9009, 573.0875), (-19.9009, 569.9125))
            ThreePointArc((-19.9009, 569.9125), (-15.1384, 565.15), (-10.3759, 569.9125))
        make_face()
        with BuildLine():
            Line((-10.3759, 665.1625), (-10.3759, 668.3375))
            ThreePointArc((-10.3759, 668.3375), (-15.1384, 673.1), (-19.9009, 668.3375))
            Line((-19.9009, 668.3375), (-19.9009, 665.1625))
            ThreePointArc((-19.9009, 665.1625), (-15.1384, 660.4), (-10.3759, 665.1625))
        make_face()
        with Locations((-15.1384, 628.65)):
            Circle(F4_R)
        with Locations((-15.1384, 609.6)):
            Circle(F4_R)
        with BuildLine():
            Line((-10.3759, 646.1125), (-10.3759, 649.2875))
            ThreePointArc((-10.3759, 649.2875), (-15.1384, 654.05), (-19.9009, 649.2875))
            Line((-19.9009, 649.2875), (-19.9009, 646.1125))
            ThreePointArc((-19.9009, 646.1125), (-15.1384, 641.35), (-10.3759, 646.1125))
        make_face()
        with BuildLine():
            Line((-10.3759, 741.3625), (-10.3759, 744.5375))
            ThreePointArc((-10.3759, 744.5375), (-15.1384, 749.3), (-19.9009, 744.5375))
            Line((-19.9009, 744.5375), (-19.9009, 741.3625))
            ThreePointArc((-19.9009, 741.3625), (-15.1384, 736.6), (-10.3759, 741.3625))
        make_face()
        with Locations((-15.1384, 704.85)):
            Circle(F4_R)
        with Locations((-15.1384, 685.8)):
            Circle(F4_R)
        with BuildLine():
            Line((-10.3759, 722.3125), (-10.3759, 725.4875))
            ThreePointArc((-10.3759, 725.4875), (-15.1384, 730.25), (-19.9009, 725.4875))
            Line((-19.9009, 725.4875), (-19.9009, 722.3125))
            ThreePointArc((-19.9009, 722.3125), (-15.1384, 717.55), (-10.3759, 722.3125))
        make_face()
        with BuildLine():
            Line((-10.3759, 817.5625), (-10.3759, 820.7375))
            ThreePointArc((-10.3759, 820.7375), (-15.1384, 825.5), (-19.9009, 820.7375))
            Line((-19.9009, 820.7375), (-19.9009, 817.5625))
            ThreePointArc((-19.9009, 817.5625), (-15.1384, 812.8), (-10.3759, 817.5625))
        make_face()
        with Locations((-15.1384, 781.05)):
            Circle(F4_R)
        with Locations((-15.1384, 762)):
            Circle(F4_R)
        with BuildLine():
            Line((-10.3759, 798.5125), (-10.3759, 801.6875))
            ThreePointArc((-10.3759, 801.6875), (-15.1384, 806.45), (-19.9009, 801.6875))
            Line((-19.9009, 801.6875), (-19.9009, 798.5125))
            ThreePointArc((-19.9009, 798.5125), (-15.1384, 793.75), (-10.3759, 798.5125))
        make_face()
        with BuildLine():
            Line((-10.3759, 893.7625), (-10.3759, 896.9375))
            ThreePointArc((-10.3759, 896.9375), (-15.1384, 901.7), (-19.9009, 896.9375))
            Line((-19.9009, 896.9375), (-19.9009, 893.7625))
            ThreePointArc((-19.9009, 893.7625), (-15.1384, 889), (-10.3759, 893.7625))
        make_face()
        with Locations((-15.1384, 857.25)):
            Circle(F4_R)
        with Locations((-15.1384, 838.2)):
            Circle(F4_R)
        with BuildLine():
            Line((-10.3759, 874.7125), (-10.3759, 877.8875))
            ThreePointArc((-10.3759, 877.8875), (-15.1384, 882.65), (-19.9009, 877.8875))
            Line((-19.9009, 877.8875), (-19.9009, 874.7125))
            ThreePointArc((-19.9009, 874.7125), (-15.1384, 869.95), (-10.3759, 874.7125))
        make_face()
        with BuildLine():
            Line((-10.3759, 969.9625), (-10.3759, 973.1375))
            ThreePointArc((-10.3759, 973.1375), (-15.1384, 977.9), (-19.9009, 973.1375))
            Line((-19.9009, 973.1375), (-19.9009, 969.9625))
            ThreePointArc((-19.9009, 969.9625), (-15.1384, 965.2), (-10.3759, 969.9625))
        make_face()
        with Locations((-15.1384, 933.45)):
            Circle(F4_R)
        with Locations((-15.1384, 914.4)):
            Circle(F4_R)
        with BuildLine():
            Line((-10.3759, 950.9125), (-10.3759, 954.0875))
            ThreePointArc((-10.3759, 954.0875), (-15.1384, 958.85), (-19.9009, 954.0875))
            Line((-19.9009, 954.0875), (-19.9009, 950.9125))
            ThreePointArc((-19.9009, 950.9125), (-15.1384, 946.15), (-10.3759, 950.9125))
        make_face()
        with BuildLine():
            Line((-10.3759, 1046.1625), (-10.3759, 1049.3375))
            ThreePointArc((-10.3759, 1049.3375), (-15.1384, 1054.1), (-19.9009, 1049.3375))
            Line((-19.9009, 1049.3375), (-19.9009, 1046.1625))
            ThreePointArc((-19.9009, 1046.1625), (-15.1384, 1041.4), (-10.3759, 1046.1625))
        make_face()
        with Locations((-15.1384, 1009.65)):
            Circle(F4_R)
        with Locations((-15.1384, 990.6)):
            Circle(F4_R)
        with BuildLine():
            Line((-10.3759, 1027.1125), (-10.3759, 1030.2875))
            ThreePointArc((-10.3759, 1030.2875), (-15.1384, 1035.05), (-19.9009, 1030.2875))
            Line((-19.9009, 1030.2875), (-19.9009, 1027.1125))
            ThreePointArc((-19.9009, 1027.1125), (-15.1384, 1022.35), (-10.3759, 1027.1125))
        make_face()
        with BuildLine():
            Line((-10.3759, 1122.3625), (-10.3759, 1125.5375))
            ThreePointArc((-10.3759, 1125.5375), (-15.1384, 1130.3), (-19.9009, 1125.5375))
            Line((-19.9009, 1125.5375), (-19.9009, 1122.3625))
            ThreePointArc((-19.9009, 1122.3625), (-15.1384, 1117.6), (-10.3759, 1122.3625))
        make_face()
        with Locations((-15.1384, 1085.85)):
            Circle(F4_R)
        with Locations((-15.1384, 1066.8)):
            Circle(F4_R)
        with BuildLine():
            Line((-10.3759, 1103.3125), (-10.3759, 1106.4875))
            ThreePointArc((-10.3759, 1106.4875), (-15.1384, 1111.25), (-19.9009, 1106.4875))
            Line((-19.9009, 1106.4875), (-19.9009, 1103.3125))
            ThreePointArc((-19.9009, 1103.3125), (-15.1384, 1098.55), (-10.3759, 1103.3125))
        make_face()
        with BuildLine():
            Line((-10.3759, 1198.5625), (-10.3759, 1201.7375))
            ThreePointArc((-10.3759, 1201.7375), (-15.1384, 1206.5), (-19.9009, 1201.7375))
            Line((-19.9009, 1201.7375), (-19.9009, 1198.5625))
            ThreePointArc((-19.9009, 1198.5625), (-15.1384, 1193.8), (-10.3759, 1198.5625))
        make_face()
        with Locations((-15.1384, 1162.05)):
            Circle(F4_R)
        with Locations((-15.1384, 1143)):
            Circle(F4_R)
        with BuildLine():
            Line((-10.3759, 1179.5125), (-10.3759, 1182.6875))
            ThreePointArc((-10.3759, 1182.6875), (-15.1384, 1187.45), (-19.9009, 1182.6875))
            Line((-19.9009, 1182.6875), (-19.9009, 1179.5125))
            ThreePointArc((-19.9009, 1179.5125), (-15.1384, 1174.75), (-10.3759, 1179.5125))
        make_face()
        with BuildLine():
            Line((-10.3759, 1274.7625), (-10.3759, 1277.9375))
            ThreePointArc((-10.3759, 1277.9375), (-15.1384, 1282.7), (-19.9009, 1277.9375))
            Line((-19.9009, 1277.9375), (-19.9009, 1274.7625))
            ThreePointArc((-19.9009, 1274.7625), (-15.1384, 1270), (-10.3759, 1274.7625))
        make_face()
        with Locations((-15.1384, 1238.25)):
            Circle(F4_R)
        with Locations((-15.1384, 1219.2)):
            Circle(F4_R)
        with BuildLine():
            Line((-10.3759, 1255.7125), (-10.3759, 1258.8875))
            ThreePointArc((-10.3759, 1258.8875), (-15.1384, 1263.65), (-19.9009, 1258.8875))
            Line((-19.9009, 1258.8875), (-19.9009, 1255.7125))
            ThreePointArc((-19.9009, 1255.7125), (-15.1384, 1250.95), (-10.3759, 1255.7125))
        make_face()
        with BuildLine():
            Line((-10.3759, 1350.9625), (-10.3759, 1354.1375))
            ThreePointArc((-10.3759, 1354.1375), (-15.1384, 1358.9), (-19.9009, 1354.1375))
            Line((-19.9009, 1354.1375), (-19.9009, 1350.9625))
            ThreePointArc((-19.9009, 1350.9625), (-15.1384, 1346.2), (-10.3759, 1350.9625))
        make_face()
        with Locations((-15.1384, 1314.45)):
            Circle(F4_R)
        with Locations((-15.1384, 1295.4)):
            Circle(F4_R)
        with BuildLine():
            Line((-10.3759, 1331.9125), (-10.3759, 1335.0875))
            ThreePointArc((-10.3759, 1335.0875), (-15.1384, 1339.85), (-19.9009, 1335.0875))
            Line((-19.9009, 1335.0875), (-19.9009, 1331.9125))
            ThreePointArc((-19.9009, 1331.9125), (-15.1384, 1327.15), (-10.3759, 1331.9125))
        make_face()
        with BuildLine():
            Line((-10.3759, 1427.1625), (-10.3759, 1430.3375))
            ThreePointArc((-10.3759, 1430.3375), (-15.1384, 1435.1), (-19.9009, 1430.3375))
            Line((-19.9009, 1430.3375), (-19.9009, 1427.1625))
            ThreePointArc((-19.9009, 1427.1625), (-15.1384, 1422.4), (-10.3759, 1427.1625))
        make_face()
        with Locations((-15.1384, 1390.65)):
            Circle(F4_R)
        with Locations((-15.1384, 1371.6)):
            Circle(F4_R)
        with BuildLine():
            Line((-10.3759, 1408.1125), (-10.3759, 1411.2875))
            ThreePointArc((-10.3759, 1411.2875), (-15.1384, 1416.05), (-19.9009, 1411.2875))
            Line((-19.9009, 1411.2875), (-19.9009, 1408.1125))
            ThreePointArc((-19.9009, 1408.1125), (-15.1384, 1403.35), (-10.3759, 1408.1125))
        make_face()
        with BuildLine():
            Line((-10.3759, 1503.3625), (-10.3759, 1506.5375))
            ThreePointArc((-10.3759, 1506.5375), (-15.1384, 1511.3), (-19.9009, 1506.5375))
            Line((-19.9009, 1506.5375), (-19.9009, 1503.3625))
            ThreePointArc((-19.9009, 1503.3625), (-15.1384, 1498.6), (-10.3759, 1503.3625))
        make_face()
        with Locations((-15.1384, 1466.85)):
            Circle(F4_R)
        with Locations((-15.1384, 1447.8)):
            Circle(F4_R)
        with BuildLine():
            Line((-10.3759, 1484.3125), (-10.3759, 1487.4875))
            ThreePointArc((-10.3759, 1487.4875), (-15.1384, 1492.25), (-19.9009, 1487.4875))
            Line((-19.9009, 1487.4875), (-19.9009, 1484.3125))
            ThreePointArc((-19.9009, 1484.3125), (-15.1384, 1479.55), (-10.3759, 1484.3125))
        make_face()
        with BuildLine():
            Line((-10.3759, 1579.5625), (-10.3759, 1582.7375))
            ThreePointArc((-10.3759, 1582.7375), (-15.1384, 1587.5), (-19.9009, 1582.7375))
            Line((-19.9009, 1582.7375), (-19.9009, 1579.5625))
            ThreePointArc((-19.9009, 1579.5625), (-15.1384, 1574.8), (-10.3759, 1579.5625))
        make_face()
        with Locations((-15.1384, 1543.05)):
            Circle(F4_R)
        with Locations((-15.1384, 1524)):
            Circle(F4_R)
        with BuildLine():
            Line((-10.3759, 1560.5125), (-10.3759, 1563.6875))
            ThreePointArc((-10.3759, 1563.6875), (-15.1384, 1568.45), (-19.9009, 1563.6875))
            Line((-19.9009, 1563.6875), (-19.9009, 1560.5125))
            ThreePointArc((-19.9009, 1560.5125), (-15.1384, 1555.75), (-10.3759, 1560.5125))
        make_face()
        with BuildLine():
            Line((-10.3759, 1655.7625), (-10.3759, 1658.9375))
            ThreePointArc((-10.3759, 1658.9375), (-15.1384, 1663.7), (-19.9009, 1658.9375))
            Line((-19.9009, 1658.9375), (-19.9009, 1655.7625))
            ThreePointArc((-19.9009, 1655.7625), (-15.1384, 1651), (-10.3759, 1655.7625))
        make_face()
        with Locations((-15.1384, 1619.25)):
            Circle(F4_R)
        with Locations((-15.1384, 1600.2)):
            Circle(F4_R)
        with BuildLine():
            Line((-10.3759, 1636.7125), (-10.3759, 1639.8875))
            ThreePointArc((-10.3759, 1639.8875), (-15.1384, 1644.65), (-19.9009, 1639.8875))
            Line((-19.9009, 1639.8875), (-19.9009, 1636.7125))
            ThreePointArc((-19.9009, 1636.7125), (-15.1384, 1631.95), (-10.3759, 1636.7125))
        make_face()
        with BuildLine():
            Line((-10.3759, 1731.9625), (-10.3759, 1735.1375))
            ThreePointArc((-10.3759, 1735.1375), (-15.1384, 1739.9), (-19.9009, 1735.1375))
            Line((-19.9009, 1735.1375), (-19.9009, 1731.9625))
            ThreePointArc((-19.9009, 1731.9625), (-15.1384, 1727.2), (-10.3759, 1731.9625))
        make_face()
        with Locations((-15.1384, 1695.45)):
            Circle(F4_R)
        with Locations((-15.1384, 1676.4)):
            Circle(F4_R)
        with BuildLine():
            Line((-10.3759, 1712.9125), (-10.3759, 1716.0875))
            ThreePointArc((-10.3759, 1716.0875), (-15.1384, 1720.85), (-19.9009, 1716.0875))
            Line((-19.9009, 1716.0875), (-19.9009, 1712.9125))
            ThreePointArc((-19.9009, 1712.9125), (-15.1384, 1708.15), (-10.3759, 1712.9125))
        make_face()
        with BuildLine():
            Line((-10.3759, 1808.1625), (-10.3759, 1811.3375))
            ThreePointArc((-10.3759, 1811.3375), (-15.1384, 1816.1), (-19.9009, 1811.3375))
            Line((-19.9009, 1811.3375), (-19.9009, 1808.1625))
            ThreePointArc((-19.9009, 1808.1625), (-15.1384, 1803.4), (-10.3759, 1808.1625))
        make_face()
        with Locations((-15.1384, 1771.65)):
            Circle(F4_R)
        with Locations((-15.1384, 1752.6)):
            Circle(F4_R)
        with BuildLine():
            Line((-10.3759, 1789.1125), (-10.3759, 1792.2875))
            ThreePointArc((-10.3759, 1792.2875), (-15.1384, 1797.05), (-19.9009, 1792.2875))
            Line((-19.9009, 1792.2875), (-19.9009, 1789.1125))
            ThreePointArc((-19.9009, 1789.1125), (-15.1384, 1784.35), (-10.3759, 1789.1125))
        make_face()
    extrude(amount=-F6_DEPTH, mode=Mode.SUBTRACT)


solid = f2.part
